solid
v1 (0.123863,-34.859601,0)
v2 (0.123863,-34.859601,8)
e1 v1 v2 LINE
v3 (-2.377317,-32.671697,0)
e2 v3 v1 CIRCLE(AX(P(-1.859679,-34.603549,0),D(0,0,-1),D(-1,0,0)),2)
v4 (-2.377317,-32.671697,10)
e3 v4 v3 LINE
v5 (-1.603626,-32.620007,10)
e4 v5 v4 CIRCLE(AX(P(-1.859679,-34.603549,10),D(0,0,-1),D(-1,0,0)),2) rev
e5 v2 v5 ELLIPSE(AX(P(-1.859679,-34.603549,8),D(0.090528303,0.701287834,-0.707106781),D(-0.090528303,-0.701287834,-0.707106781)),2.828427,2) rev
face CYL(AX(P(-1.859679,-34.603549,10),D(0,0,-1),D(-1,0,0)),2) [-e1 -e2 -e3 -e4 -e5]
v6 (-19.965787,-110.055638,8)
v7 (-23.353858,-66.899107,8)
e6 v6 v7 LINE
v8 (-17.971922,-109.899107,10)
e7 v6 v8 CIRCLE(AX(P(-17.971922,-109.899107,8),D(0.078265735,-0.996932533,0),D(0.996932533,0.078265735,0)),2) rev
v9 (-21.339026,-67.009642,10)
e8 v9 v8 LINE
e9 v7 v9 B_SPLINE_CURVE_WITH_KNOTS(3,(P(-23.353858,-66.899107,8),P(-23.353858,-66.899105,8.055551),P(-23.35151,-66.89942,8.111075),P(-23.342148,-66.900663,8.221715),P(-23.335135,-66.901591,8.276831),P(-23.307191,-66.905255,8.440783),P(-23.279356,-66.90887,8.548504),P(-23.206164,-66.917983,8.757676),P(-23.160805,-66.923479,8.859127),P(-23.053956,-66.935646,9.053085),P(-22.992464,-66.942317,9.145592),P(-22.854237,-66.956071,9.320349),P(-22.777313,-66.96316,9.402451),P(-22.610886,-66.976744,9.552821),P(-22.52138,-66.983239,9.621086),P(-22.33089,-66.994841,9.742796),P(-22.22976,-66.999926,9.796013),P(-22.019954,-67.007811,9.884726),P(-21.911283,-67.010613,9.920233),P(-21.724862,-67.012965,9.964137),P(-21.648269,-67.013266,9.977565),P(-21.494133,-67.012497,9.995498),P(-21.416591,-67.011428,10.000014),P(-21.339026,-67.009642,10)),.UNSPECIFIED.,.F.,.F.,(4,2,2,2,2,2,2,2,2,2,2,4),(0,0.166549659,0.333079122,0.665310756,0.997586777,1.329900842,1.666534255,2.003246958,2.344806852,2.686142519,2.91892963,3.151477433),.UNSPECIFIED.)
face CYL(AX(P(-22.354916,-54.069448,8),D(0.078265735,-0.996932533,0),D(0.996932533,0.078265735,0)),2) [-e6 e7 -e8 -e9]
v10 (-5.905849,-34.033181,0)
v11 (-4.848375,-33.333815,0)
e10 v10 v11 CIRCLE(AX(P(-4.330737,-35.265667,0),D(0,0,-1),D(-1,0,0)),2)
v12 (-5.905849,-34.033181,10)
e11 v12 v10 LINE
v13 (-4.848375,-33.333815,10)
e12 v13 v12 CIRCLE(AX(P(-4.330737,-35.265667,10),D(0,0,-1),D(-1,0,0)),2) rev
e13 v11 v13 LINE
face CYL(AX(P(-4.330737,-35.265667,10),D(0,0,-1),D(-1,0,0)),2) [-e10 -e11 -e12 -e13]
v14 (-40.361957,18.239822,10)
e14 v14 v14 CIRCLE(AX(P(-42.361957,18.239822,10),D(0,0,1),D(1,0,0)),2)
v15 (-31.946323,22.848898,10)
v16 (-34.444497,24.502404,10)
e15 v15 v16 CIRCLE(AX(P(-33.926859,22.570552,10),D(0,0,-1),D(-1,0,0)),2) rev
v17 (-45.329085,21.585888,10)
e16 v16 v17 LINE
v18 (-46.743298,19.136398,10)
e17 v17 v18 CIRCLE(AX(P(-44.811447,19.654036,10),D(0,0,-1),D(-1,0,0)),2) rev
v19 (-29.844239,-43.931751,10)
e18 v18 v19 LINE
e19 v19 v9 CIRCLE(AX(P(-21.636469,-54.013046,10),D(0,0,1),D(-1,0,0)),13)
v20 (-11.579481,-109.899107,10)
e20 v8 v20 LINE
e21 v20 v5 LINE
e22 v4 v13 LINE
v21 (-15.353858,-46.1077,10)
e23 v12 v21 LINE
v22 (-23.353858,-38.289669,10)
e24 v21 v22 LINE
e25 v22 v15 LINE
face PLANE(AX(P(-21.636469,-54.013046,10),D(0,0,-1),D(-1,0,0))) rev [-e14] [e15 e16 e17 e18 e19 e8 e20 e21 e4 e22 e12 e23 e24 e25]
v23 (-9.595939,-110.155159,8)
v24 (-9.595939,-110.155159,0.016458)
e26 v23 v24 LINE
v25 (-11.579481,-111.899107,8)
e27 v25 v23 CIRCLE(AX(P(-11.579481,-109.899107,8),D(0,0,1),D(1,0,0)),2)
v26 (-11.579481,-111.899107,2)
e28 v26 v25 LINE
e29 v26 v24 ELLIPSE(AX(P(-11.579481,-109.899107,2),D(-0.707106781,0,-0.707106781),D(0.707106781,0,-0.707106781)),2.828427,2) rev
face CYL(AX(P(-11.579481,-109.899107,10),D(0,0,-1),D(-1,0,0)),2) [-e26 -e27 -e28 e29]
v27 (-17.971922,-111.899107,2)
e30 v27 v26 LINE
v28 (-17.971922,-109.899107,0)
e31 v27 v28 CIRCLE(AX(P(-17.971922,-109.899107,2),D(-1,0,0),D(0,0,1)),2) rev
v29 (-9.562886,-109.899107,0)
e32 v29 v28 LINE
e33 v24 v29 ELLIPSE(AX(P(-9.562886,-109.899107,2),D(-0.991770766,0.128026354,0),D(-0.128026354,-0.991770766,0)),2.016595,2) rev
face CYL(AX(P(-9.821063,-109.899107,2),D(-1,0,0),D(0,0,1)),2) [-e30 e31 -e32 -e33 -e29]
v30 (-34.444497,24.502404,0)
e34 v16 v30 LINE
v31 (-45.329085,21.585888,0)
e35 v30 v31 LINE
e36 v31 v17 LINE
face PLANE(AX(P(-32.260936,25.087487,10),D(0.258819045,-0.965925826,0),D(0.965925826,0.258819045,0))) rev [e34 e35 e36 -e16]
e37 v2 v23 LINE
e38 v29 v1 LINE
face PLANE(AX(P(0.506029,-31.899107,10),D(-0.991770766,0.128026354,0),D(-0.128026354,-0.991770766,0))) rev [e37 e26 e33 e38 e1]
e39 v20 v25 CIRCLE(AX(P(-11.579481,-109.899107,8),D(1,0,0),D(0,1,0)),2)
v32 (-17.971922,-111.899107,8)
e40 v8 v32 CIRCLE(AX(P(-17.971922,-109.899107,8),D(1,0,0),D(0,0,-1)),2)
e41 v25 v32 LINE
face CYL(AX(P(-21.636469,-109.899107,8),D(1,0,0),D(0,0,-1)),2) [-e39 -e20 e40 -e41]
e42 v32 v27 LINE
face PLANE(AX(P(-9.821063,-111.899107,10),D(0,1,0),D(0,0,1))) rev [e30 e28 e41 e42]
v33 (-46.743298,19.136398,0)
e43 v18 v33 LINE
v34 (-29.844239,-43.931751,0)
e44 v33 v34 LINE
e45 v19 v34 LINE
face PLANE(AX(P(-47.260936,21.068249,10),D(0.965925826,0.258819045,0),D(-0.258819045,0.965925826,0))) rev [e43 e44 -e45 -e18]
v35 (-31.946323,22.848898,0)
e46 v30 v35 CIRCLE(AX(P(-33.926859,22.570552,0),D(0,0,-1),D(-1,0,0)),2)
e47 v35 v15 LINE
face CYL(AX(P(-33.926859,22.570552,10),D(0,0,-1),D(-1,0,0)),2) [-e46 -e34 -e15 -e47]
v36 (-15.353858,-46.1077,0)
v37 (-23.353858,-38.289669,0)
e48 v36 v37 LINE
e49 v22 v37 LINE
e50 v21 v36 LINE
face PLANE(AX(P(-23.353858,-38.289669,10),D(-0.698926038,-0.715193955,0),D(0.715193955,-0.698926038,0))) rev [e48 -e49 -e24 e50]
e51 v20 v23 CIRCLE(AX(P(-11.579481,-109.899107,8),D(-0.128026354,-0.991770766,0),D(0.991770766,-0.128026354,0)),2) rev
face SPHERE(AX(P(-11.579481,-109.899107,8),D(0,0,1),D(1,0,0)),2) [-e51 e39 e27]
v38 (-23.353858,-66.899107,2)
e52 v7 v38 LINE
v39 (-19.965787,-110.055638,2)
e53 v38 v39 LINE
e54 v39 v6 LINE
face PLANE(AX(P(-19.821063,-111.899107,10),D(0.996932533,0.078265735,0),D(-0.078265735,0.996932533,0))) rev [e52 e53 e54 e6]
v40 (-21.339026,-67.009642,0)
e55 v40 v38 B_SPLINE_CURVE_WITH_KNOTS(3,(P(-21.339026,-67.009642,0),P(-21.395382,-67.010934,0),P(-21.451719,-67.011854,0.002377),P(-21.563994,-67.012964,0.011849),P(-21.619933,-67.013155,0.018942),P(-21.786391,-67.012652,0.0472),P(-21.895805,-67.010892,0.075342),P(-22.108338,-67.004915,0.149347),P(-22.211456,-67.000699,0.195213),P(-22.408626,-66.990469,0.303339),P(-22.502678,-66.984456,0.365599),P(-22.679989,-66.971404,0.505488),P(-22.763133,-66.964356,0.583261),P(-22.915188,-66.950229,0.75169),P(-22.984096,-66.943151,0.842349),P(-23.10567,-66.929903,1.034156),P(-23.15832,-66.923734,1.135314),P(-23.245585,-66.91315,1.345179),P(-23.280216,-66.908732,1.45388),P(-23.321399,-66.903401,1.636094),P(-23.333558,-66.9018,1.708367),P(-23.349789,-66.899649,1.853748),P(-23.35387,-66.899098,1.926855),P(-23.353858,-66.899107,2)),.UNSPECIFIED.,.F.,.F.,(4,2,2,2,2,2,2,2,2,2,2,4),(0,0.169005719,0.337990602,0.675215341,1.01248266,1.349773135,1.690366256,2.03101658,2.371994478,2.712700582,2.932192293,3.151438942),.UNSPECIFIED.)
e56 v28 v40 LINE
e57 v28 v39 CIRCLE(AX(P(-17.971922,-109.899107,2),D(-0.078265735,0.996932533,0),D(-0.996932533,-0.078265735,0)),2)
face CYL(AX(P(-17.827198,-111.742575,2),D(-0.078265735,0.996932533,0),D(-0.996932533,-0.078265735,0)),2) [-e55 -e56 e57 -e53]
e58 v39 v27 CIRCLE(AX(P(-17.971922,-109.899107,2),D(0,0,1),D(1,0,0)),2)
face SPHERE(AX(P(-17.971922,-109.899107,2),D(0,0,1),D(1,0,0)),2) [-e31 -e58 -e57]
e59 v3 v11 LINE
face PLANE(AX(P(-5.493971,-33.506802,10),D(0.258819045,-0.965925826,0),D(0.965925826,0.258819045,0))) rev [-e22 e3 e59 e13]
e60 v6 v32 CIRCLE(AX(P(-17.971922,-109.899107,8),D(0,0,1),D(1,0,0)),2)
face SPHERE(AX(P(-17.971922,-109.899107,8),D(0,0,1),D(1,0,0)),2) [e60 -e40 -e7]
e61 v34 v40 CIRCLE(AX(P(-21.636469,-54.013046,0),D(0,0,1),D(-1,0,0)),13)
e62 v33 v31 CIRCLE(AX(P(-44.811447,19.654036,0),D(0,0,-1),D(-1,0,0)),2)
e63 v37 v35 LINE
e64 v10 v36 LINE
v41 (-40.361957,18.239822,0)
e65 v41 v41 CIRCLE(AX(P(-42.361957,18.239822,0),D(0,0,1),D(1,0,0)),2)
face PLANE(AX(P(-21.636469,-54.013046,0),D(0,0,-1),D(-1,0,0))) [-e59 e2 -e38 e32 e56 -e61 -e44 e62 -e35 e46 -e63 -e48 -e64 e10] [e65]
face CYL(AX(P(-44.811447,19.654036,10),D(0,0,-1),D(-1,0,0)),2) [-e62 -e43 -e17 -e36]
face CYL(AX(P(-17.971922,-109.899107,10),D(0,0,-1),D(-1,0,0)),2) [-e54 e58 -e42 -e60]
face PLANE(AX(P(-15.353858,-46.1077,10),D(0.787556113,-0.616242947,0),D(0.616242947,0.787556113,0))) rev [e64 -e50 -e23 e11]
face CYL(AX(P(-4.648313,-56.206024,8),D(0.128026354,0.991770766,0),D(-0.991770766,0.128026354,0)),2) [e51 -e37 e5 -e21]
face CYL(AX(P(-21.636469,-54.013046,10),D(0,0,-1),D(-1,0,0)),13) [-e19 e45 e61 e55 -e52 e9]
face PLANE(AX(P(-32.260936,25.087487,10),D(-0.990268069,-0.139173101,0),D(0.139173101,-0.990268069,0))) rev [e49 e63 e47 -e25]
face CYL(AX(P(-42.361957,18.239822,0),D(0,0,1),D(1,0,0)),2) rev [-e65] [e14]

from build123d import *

# Parameters (mm, degrees)
BOSS_EXTRUDE1_DEPTH = 10
SKETCH5_R           = 2
CUT_EXTRUDE1_DEPTH  = 122.881115044
FILLET3_R           = 2
FILLET4_R           = 2


with BuildPart() as part:
    # Sketch3 → Boss-Extrude1 (new body)
    with BuildSketch(Plane.XY):
        with BuildLine():
            Line((-32.260936358, 25.087487365), (-47.260936358, 21.068249478))
            Line((-47.260936358, 21.068249478), (-29.84423885, -43.931750522))
            ThreePointArc((-29.84423885, -43.931750522), (-34.146547057, -57.548288053), (-23.353857896, -66.899106783))
            Line((-23.353857896, -66.899106783), (-19.821063106, -111.899106783))
            Line((-19.821063106, -111.899106783), (-9.821063106, -111.899106783))
            Line((-9.821063106, -111.899106783), (0.506029252, -31.899106783))
            Line((0.506029252, -31.899106783), (-5.493970748, -33.506801938))
            Line((-5.493970748, -33.506801938), (-15.353857896, -46.107699741))
            Line((-15.353857896, -46.107699741), (-23.353857896, -38.289669035))
            Line((-23.353857896, -38.289669035), (-32.260936358, 25.087487365))
        make_face()
    extrude(amount=BOSS_EXTRUDE1_DEPTH)

    # Sketch5 → Cut-Extrude1 (cut, through all)
    with BuildSketch(Plane.XY.offset(10)):
        with Locations((-42.361956872, 18.239822354)):
            Circle(SKETCH5_R)
    extrude(amount=-CUT_EXTRUDE1_DEPTH, mode=Mode.SUBTRACT)

    # Fillet3
    fillet3_edges = [part.edges().sort_by_distance(p)[0] for p in [
        (-14.821063106, -111.899106783, 0),
        (-21.587460501, -89.399106783, 0),
        (-5.493970748, -33.506801938, 5),
        (0.506029252, -31.899106783, 5),
        (-9.821063106, -111.899106783, 5),
        (-47.260936358, 21.068249478, 5),
        (-32.260936358, 25.087487365, 5),
        (-21.587460501, -89.399106783, 10),
        (-14.821063106, -111.899106783, 10),
        (-4.657516927, -71.899106783, 10),
    ]]
    fillet(fillet3_edges, radius=FILLET3_R)

    # Fillet4
    # the kernel refuses this fillet: 2 mm, written as the material it takes off along each edge
    with BuildSketch(Plane(origin=(-17.971922396, -109.899106783, 2), x_dir=(0, -1, 0), z_dir=(0, 0, -1))) as fillet4_piece_1_section:
        Polygon((0, 0), (FILLET4_R, 0), (FILLET4_R, FILLET4_R * 0.924570354696), (FILLET4_R * 0.0782657346199, FILLET4_R * 0.996932532714), align=None)
    fillet4_piece_1 = extrude(amount=FILLET4_R, mode=Mode.PRIVATE)
    fillet4_piece_1 = fillet4_piece_1 - Plane(origin=(-17.971922396, -109.899106783, 2), x_dir=(0.6788719560344534, 0.7342566767214005, 0), z_dir=(0, 0, -1)) * Sphere(FILLET4_R, mode=Mode.PRIVATE)
    add(fillet4_piece_1, mode=Mode.SUBTRACT)
    with BuildSketch(Plane(origin=(-17.971922396, -109.899106783, 8), x_dir=(0, -1, 0), z_dir=(0, 0, 1))) as fillet4_piece_2_section:
        Polygon((0, 0), (FILLET4_R, 0), (FILLET4_R, -FILLET4_R * 0.924570354696), (FILLET4_R * 0.0782657346199, -FILLET4_R * 0.996932532714), align=None)
    fillet4_piece_2 = extrude(amount=FILLET4_R, mode=Mode.PRIVATE)
    fillet4_piece_2 = fillet4_piece_2 - Plane(origin=(-17.971922396, -109.899106783, 8), x_dir=(0.6788719560344534, 0.7342566767214005, 0), z_dir=(0, 0, 1)) * Sphere(FILLET4_R, mode=Mode.PRIVATE)
    add(fillet4_piece_2, mode=Mode.SUBTRACT)
    with BuildSketch(Plane(origin=(-19.821063106, -111.899106783, 2), x_dir=(1, 0, 0), z_dir=(0, 0, 1))) as fillet4_piece_3:
        with BuildLine():
            CenterArc((FILLET4_R * 0.924570354696, FILLET4_R), FILLET4_R, 184.488887052, 85.511112948)
            Line((-FILLET4_R * 0.0723621780181, FILLET4_R * 0.92173426538), (0, 0))
            Line((0, 0), (FILLET4_R * 0.924570354696, 0))
        make_face()
    extrude(amount=6, mode=Mode.SUBTRACT)


solid = part.part
